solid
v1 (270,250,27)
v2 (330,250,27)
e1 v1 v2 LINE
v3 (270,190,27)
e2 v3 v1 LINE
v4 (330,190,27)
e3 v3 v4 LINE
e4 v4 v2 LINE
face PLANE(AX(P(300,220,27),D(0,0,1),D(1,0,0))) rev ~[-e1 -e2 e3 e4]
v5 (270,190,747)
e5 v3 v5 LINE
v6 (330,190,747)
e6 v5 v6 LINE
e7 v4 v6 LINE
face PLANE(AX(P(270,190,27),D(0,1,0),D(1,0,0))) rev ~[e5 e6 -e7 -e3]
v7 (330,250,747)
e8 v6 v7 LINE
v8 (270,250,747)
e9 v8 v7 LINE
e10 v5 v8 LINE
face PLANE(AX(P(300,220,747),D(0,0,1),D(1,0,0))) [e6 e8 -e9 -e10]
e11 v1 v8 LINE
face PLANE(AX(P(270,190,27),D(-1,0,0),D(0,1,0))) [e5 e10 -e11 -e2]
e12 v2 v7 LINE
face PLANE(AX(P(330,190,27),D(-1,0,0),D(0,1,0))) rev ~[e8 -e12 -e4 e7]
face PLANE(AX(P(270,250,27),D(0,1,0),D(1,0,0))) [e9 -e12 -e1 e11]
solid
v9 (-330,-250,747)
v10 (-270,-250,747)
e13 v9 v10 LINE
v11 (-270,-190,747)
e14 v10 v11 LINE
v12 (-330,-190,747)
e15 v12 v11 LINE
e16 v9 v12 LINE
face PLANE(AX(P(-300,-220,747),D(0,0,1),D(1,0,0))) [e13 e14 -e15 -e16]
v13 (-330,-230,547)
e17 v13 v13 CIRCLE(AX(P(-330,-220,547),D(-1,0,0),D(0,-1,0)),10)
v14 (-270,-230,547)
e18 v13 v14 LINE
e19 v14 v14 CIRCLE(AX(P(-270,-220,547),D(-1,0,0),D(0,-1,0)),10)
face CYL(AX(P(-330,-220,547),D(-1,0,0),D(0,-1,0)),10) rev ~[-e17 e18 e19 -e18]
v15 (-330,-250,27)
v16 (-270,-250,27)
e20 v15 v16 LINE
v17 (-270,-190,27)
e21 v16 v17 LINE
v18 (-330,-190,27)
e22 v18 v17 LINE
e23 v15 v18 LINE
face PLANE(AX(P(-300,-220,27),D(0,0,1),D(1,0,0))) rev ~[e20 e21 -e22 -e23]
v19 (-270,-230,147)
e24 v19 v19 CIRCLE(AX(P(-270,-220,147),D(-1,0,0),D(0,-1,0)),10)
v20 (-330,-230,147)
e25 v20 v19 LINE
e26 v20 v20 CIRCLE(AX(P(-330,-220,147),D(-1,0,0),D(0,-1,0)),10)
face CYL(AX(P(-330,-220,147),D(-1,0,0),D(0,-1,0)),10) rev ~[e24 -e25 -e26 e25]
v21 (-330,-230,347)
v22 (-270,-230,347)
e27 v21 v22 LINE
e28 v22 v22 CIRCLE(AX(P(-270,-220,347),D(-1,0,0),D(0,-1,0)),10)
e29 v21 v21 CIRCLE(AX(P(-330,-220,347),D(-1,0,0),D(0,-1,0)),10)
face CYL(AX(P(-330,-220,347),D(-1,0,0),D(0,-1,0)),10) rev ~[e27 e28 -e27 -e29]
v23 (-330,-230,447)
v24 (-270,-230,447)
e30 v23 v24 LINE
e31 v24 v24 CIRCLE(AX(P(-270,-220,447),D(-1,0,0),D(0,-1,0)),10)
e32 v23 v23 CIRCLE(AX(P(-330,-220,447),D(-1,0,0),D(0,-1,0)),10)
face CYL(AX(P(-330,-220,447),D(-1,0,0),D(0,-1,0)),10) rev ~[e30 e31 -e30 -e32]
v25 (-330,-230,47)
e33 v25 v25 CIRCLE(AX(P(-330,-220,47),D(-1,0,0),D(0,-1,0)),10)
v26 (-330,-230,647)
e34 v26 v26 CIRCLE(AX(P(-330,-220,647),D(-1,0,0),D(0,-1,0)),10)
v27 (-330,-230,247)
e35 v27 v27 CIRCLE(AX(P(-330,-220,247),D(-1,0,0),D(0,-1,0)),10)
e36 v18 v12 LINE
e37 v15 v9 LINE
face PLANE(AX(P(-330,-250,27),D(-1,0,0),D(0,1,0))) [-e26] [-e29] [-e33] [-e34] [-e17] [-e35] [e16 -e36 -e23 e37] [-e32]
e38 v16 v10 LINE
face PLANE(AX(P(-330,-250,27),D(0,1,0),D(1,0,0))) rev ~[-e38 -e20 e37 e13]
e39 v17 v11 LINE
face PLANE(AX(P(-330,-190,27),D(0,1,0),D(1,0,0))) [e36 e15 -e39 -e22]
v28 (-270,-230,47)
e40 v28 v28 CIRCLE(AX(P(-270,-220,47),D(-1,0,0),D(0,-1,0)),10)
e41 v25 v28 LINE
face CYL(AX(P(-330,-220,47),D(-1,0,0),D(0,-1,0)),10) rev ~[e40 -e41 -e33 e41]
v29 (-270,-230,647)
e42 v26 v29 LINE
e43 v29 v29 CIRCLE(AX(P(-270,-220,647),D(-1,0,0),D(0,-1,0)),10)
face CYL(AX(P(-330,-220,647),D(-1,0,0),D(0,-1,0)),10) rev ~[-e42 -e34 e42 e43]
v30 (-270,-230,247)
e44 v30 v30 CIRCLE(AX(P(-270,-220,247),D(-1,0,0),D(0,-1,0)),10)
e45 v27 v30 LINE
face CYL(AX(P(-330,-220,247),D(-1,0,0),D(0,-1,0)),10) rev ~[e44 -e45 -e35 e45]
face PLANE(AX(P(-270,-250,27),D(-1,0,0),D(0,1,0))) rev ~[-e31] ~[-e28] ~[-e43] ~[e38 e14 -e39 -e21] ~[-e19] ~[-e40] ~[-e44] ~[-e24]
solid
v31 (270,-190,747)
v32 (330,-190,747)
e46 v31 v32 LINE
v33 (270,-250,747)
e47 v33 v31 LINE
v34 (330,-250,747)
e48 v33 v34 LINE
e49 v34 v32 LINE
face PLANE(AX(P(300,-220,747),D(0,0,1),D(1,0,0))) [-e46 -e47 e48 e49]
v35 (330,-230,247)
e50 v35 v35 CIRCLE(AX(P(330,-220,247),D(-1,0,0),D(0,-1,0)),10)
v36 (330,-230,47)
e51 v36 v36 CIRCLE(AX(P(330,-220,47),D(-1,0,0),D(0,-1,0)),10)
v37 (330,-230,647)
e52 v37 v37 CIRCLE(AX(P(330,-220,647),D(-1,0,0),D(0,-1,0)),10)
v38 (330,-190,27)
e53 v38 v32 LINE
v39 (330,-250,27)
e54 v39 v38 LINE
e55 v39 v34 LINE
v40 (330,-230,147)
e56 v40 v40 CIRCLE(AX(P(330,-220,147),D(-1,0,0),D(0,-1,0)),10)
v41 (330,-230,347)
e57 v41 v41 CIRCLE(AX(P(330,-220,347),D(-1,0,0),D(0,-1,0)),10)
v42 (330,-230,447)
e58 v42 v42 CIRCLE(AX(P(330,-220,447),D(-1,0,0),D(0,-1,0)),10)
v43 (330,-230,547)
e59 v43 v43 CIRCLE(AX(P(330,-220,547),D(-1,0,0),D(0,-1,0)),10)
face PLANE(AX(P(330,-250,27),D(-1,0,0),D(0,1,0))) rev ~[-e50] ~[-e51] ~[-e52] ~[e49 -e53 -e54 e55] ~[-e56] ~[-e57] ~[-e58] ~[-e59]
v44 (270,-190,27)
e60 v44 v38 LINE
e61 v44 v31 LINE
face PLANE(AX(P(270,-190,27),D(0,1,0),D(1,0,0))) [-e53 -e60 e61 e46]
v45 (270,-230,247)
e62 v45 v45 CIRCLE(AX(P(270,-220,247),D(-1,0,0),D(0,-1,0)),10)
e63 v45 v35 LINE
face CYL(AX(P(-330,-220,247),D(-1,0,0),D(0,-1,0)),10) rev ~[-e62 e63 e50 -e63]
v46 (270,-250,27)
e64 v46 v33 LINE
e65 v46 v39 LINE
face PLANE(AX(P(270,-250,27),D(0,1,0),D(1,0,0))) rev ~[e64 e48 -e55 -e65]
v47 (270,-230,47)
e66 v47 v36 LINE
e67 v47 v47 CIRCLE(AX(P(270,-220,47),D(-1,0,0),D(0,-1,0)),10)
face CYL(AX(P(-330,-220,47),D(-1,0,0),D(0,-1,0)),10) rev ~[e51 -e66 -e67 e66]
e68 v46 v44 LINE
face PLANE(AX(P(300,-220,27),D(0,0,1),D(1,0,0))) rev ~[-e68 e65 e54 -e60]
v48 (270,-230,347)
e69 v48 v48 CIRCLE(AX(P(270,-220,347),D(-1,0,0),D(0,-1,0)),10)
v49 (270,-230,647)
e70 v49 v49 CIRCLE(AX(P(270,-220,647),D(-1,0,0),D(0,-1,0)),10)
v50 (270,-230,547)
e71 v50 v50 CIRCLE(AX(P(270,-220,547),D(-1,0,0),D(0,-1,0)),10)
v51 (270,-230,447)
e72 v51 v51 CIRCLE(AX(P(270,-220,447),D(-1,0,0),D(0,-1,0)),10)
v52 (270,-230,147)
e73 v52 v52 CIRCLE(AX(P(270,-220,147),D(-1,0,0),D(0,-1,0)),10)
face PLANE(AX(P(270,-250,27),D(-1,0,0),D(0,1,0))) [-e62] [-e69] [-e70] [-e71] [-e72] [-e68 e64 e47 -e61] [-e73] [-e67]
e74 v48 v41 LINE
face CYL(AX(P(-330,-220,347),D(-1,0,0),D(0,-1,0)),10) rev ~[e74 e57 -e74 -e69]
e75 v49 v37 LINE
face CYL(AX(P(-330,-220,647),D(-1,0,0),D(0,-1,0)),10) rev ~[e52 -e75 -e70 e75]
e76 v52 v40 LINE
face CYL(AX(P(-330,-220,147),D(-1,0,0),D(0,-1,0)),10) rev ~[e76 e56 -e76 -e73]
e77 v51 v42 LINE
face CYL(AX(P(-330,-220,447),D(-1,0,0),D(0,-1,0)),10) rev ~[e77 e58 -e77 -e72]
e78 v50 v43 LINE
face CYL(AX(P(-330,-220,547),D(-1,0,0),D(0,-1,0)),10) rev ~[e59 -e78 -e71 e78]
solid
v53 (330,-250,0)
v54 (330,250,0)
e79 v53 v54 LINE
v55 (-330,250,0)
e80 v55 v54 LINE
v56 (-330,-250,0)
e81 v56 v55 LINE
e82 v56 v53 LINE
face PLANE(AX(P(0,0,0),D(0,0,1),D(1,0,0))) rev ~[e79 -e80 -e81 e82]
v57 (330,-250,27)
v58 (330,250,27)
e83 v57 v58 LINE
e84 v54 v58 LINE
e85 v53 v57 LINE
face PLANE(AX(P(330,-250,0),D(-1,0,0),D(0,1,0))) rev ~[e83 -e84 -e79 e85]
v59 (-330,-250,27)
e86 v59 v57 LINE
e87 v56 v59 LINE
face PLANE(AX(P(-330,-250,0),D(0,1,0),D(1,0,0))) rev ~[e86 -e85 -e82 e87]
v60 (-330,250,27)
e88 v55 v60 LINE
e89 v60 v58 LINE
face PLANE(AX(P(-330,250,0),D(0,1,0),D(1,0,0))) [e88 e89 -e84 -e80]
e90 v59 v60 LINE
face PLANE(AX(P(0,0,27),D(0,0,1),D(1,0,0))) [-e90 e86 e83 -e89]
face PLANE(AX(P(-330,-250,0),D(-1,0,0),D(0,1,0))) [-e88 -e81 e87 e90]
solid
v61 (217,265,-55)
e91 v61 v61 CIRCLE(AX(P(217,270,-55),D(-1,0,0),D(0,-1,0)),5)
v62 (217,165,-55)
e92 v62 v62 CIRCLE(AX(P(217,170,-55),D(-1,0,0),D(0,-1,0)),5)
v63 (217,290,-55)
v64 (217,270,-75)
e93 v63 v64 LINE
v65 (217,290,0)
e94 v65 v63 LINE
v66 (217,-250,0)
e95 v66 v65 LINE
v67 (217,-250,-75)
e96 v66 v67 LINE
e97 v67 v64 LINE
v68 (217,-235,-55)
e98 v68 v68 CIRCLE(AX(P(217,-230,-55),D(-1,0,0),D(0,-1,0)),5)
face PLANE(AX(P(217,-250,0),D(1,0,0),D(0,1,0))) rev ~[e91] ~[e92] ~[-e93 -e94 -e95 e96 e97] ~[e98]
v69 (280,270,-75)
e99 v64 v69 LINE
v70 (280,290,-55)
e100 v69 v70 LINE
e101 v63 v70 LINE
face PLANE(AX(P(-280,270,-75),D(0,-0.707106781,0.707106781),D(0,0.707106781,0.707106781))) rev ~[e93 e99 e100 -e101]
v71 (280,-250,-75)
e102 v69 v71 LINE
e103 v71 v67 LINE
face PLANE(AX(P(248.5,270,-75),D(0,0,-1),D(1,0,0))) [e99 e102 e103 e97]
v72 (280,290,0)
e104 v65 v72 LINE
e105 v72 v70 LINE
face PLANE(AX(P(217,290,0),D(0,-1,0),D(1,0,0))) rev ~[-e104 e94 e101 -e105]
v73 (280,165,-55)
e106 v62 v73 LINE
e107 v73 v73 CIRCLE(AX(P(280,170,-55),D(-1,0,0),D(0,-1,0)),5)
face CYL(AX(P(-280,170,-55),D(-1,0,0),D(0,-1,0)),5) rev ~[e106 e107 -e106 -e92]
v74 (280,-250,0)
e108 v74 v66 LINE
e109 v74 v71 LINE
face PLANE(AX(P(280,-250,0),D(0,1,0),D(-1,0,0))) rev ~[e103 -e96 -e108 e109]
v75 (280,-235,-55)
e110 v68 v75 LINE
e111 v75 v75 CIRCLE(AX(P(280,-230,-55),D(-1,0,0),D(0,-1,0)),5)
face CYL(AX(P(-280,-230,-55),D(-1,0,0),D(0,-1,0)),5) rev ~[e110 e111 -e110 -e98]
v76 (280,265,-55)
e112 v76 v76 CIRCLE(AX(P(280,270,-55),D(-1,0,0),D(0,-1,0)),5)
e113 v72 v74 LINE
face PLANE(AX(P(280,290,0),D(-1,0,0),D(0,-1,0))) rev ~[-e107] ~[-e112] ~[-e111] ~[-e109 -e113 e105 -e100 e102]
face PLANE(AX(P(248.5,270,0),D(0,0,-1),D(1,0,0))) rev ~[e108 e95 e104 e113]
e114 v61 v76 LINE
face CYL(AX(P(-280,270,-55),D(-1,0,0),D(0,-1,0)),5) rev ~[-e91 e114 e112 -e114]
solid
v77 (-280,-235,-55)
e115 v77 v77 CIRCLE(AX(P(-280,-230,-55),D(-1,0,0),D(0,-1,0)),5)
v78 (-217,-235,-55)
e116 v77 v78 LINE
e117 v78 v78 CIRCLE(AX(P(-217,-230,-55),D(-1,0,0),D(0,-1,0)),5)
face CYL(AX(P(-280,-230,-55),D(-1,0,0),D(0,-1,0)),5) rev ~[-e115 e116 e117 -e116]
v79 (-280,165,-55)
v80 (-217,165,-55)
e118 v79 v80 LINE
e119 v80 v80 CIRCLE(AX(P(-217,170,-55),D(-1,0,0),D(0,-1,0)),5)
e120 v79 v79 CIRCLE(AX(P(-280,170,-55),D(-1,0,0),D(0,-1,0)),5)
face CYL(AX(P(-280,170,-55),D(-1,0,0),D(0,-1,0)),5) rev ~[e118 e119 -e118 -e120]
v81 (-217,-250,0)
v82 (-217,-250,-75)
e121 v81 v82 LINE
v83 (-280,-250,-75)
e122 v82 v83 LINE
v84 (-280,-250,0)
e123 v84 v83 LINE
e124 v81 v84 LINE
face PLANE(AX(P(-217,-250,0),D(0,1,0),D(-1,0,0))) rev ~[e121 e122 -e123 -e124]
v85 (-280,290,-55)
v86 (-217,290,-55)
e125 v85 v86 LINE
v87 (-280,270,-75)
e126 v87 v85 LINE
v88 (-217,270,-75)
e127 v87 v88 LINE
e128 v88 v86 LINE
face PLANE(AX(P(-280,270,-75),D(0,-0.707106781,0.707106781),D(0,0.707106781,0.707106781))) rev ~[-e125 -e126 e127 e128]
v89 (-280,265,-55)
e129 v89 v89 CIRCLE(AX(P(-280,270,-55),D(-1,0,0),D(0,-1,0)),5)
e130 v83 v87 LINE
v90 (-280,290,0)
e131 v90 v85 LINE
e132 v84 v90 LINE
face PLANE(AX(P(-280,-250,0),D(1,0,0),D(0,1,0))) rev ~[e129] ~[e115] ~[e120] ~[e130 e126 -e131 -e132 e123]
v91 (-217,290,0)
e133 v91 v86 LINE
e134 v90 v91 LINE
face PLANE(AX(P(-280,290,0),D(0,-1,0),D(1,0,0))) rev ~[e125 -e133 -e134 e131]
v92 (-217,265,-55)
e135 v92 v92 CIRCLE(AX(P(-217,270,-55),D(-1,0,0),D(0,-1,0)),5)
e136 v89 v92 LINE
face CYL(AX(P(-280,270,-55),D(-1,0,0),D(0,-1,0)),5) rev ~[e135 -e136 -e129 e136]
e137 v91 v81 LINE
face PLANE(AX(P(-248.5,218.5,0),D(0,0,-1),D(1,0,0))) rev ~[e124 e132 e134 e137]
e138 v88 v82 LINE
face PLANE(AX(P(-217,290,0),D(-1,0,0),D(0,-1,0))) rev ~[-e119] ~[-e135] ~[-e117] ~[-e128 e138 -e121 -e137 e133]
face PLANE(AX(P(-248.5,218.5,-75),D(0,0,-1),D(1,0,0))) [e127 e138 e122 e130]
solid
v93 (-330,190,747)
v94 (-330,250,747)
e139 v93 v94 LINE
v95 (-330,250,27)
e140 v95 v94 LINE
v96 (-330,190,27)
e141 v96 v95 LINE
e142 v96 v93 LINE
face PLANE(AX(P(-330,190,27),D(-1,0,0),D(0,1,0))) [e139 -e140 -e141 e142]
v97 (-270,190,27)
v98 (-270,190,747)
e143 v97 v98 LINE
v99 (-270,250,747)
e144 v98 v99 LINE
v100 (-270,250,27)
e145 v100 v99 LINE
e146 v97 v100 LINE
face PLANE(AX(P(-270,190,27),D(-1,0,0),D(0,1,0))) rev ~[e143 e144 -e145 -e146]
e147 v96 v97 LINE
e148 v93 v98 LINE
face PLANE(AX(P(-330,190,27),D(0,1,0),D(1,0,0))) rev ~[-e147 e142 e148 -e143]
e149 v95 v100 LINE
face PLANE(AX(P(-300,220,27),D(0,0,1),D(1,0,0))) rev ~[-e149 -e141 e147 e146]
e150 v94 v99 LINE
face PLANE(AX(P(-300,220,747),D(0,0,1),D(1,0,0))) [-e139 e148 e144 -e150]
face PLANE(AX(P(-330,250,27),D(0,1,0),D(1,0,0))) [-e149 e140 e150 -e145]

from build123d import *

# Parameters (mm, degrees)
F0_W      = 660
F0_H      = 500
F1_DEPTH  = 27
F2_W      = 60
F2_H      = 60
F3_DEPTH  = 720
F4_W      = 63
F4_H      = 63
F4_H_2    = 40
F4_H_3    = 33
F5_DEPTH  = 75
F6_R      = 5
F7_DEPTH  = 610.001
F9_R      = 5
F10_DEPTH = 610.001
F12_DEPTH = 610.001
F8_R      = 10
F13_DEPTH = 660.001


# Not quite as in the source:
# - a feature names something its author has since deleted; it is built from what else it names


with BuildPart() as f1:
    # F0 (on Top) → F1 (new body)
    with BuildSketch(Plane.XY):
        Rectangle(F0_W, F0_H)
    extrude(amount=F1_DEPTH)


with BuildPart() as f3:
    # F2 (on face) → F3 (new body)
    with BuildSketch(Plane.XY.offset(27)):
        with Locations((-300, 220)):
            Rectangle(F2_W, F2_H)
    extrude(amount=F3_DEPTH)


with BuildPart() as f3b:
    # F2 (on face) → F3, piece 2 (new body)
    with BuildSketch(Plane.XY.offset(27)):
        with Locations((300, 220)):
            Rectangle(F2_W, F2_H)
    extrude(amount=F3_DEPTH)


with BuildPart() as f3c:
    # F2 (on face) → F3, piece 3 (new body)
    with BuildSketch(Plane.XY.offset(27)):
        with Locations((300, -220)):
            Rectangle(F2_W, F2_H)
    extrude(amount=F3_DEPTH)


with BuildPart() as f3d:
    # F2 (on face) → F3, piece 4 (new body)
    with BuildSketch(Plane.XY.offset(27)):
        with Locations((-300, -220)):
            Rectangle(F2_W, F2_H)
    extrude(amount=F3_DEPTH)


with BuildPart() as f5:
    # F4 (on face) → F5 (new body)
    with BuildSketch(Plane(origin=(0, 0, 0), x_dir=(1, 0, 0), z_dir=(0, 0, -1))):
        with Locations((-248.5, -218.5)):
            Rectangle(F4_W, F4_H)
        with Locations((-248.5, -270)):
            Rectangle(F4_W, F4_H_2)
        Polygon((-280, 217), (-280, -154), (-217, -154), (-217, 217), (-217, 250), (-280, 250), align=None)
        with Locations((-248.5, -170.5)):
            Rectangle(F4_W, F4_H_3)
    extrude(amount=F5_DEPTH)


with BuildPart() as f5b:
    # F4 (on face) → F5, piece 2 (new body)
    with BuildSketch(Plane(origin=(0, 0, 0), x_dir=(1, 0, 0), z_dir=(0, 0, -1))):
        with Locations((248.5, -270)):
            Rectangle(F4_W, F4_H_2)
        with Locations((248.5, -218.5)):
            Rectangle(F4_W, F4_H)
        Polygon((217, 217), (217, -154), (280, -154), (280, 217), (280, 250), (217, 250), align=None)
        with Locations((248.5, -170.5)):
            Rectangle(F4_W, F4_H_3)
    extrude(amount=F5_DEPTH)


with BuildPart() as f7_tool:
    # F6 (on face) → F7 (new body, through all)
    with BuildSketch(Plane(origin=(-280, 0, 0), x_dir=(0, -1, 0), z_dir=(-1, 0, 0))):
        with Locations((-270, -55)):
            Circle(F6_R)
    extrude(amount=-F7_DEPTH)


with BuildPart() as f5_1:
    add(f5.part)

    # F7: cut by f7_tool
    add(f7_tool.part, mode=Mode.SUBTRACT)


with BuildPart() as f5b_1:
    add(f5b.part)

    # F7: cut by f7_tool
    add(f7_tool.part, mode=Mode.SUBTRACT)


with BuildPart() as f10_tool:
    # F9 (on face) → F10 (new body, through all)
    with BuildSketch(Plane(origin=(-280, 0, 0), x_dir=(0, -1, 0), z_dir=(-1, 0, 0))):
        with Locations((230, -55)):
            Circle(F9_R)
        with Locations((-170, -55)):
            Circle(F9_R)
    extrude(amount=-F10_DEPTH)


with BuildPart() as f5_2:
    add(f5_1.part)

    # F10: cut by f10_tool
    add(f10_tool.part, mode=Mode.SUBTRACT)


with BuildPart() as f5b_2:
    add(f5b_1.part)

    # F10: cut by f10_tool
    add(f10_tool.part, mode=Mode.SUBTRACT)


with BuildPart() as f12_tool:
    # F11 (on face) → F12 (new body, through all)
    with BuildSketch(Plane(origin=(-280, 0, 0), x_dir=(0, -1, 0), z_dir=(-1, 0, 0))):
        Polygon((-290, -55), (-290, -75), (-270, -75), align=None)
    extrude(amount=-F12_DEPTH)


with BuildPart() as f5_3:
    add(f5_2.part)

    # F12: cut by f12_tool
    add(f12_tool.part, mode=Mode.SUBTRACT)


with BuildPart() as f5b_3:
    add(f5b_2.part)

    # F12: cut by f12_tool
    add(f12_tool.part, mode=Mode.SUBTRACT)


with BuildPart() as f13_tool:
    # F8 (on face) → F13 (new body, through all)
    with BuildSketch(Plane(origin=(-330, 0, 0), x_dir=(0, -1, 0), z_dir=(-1, 0, 0))):
        with Locations((220, 647)):
            Circle(F8_R)
        with Locations((220, 547)):
            Circle(F8_R)
        with Locations((220, 447)):
            Circle(F8_R)
        with Locations((220, 347)):
            Circle(F8_R)
        with Locations((220, 247)):
            Circle(F8_R)
        with Locations((-220, 647)):
            Circle(F8_R)
        with Locations((-220, 547)):
            Circle(F8_R)
        with Locations((-220, 447)):
            Circle(F8_R)
        with Locations((-220, 347)):
            Circle(F8_R)
        with Locations((-220, 247)):
            Circle(F8_R)
        with Locations((-220, 147)):
            Circle(F8_R)
        with Locations((-220, 47)):
            Circle(F8_R)
        with Locations((220, 147)):
            Circle(F8_R)
        with Locations((220, 47)):
            Circle(F8_R)
    extrude(amount=-F13_DEPTH)


with BuildPart() as f3c_1:
    add(f3c.part)

    # F13: cut by f13_tool
    add(f13_tool.part, mode=Mode.SUBTRACT)


with BuildPart() as f3d_1:
    add(f3d.part)

    # F13: cut by f13_tool
    add(f13_tool.part, mode=Mode.SUBTRACT)


solid = Compound([f1.part, f3.part, f3b.part, f5_3.part, f5b_3.part, f3c_1.part, f3d_1.part])
